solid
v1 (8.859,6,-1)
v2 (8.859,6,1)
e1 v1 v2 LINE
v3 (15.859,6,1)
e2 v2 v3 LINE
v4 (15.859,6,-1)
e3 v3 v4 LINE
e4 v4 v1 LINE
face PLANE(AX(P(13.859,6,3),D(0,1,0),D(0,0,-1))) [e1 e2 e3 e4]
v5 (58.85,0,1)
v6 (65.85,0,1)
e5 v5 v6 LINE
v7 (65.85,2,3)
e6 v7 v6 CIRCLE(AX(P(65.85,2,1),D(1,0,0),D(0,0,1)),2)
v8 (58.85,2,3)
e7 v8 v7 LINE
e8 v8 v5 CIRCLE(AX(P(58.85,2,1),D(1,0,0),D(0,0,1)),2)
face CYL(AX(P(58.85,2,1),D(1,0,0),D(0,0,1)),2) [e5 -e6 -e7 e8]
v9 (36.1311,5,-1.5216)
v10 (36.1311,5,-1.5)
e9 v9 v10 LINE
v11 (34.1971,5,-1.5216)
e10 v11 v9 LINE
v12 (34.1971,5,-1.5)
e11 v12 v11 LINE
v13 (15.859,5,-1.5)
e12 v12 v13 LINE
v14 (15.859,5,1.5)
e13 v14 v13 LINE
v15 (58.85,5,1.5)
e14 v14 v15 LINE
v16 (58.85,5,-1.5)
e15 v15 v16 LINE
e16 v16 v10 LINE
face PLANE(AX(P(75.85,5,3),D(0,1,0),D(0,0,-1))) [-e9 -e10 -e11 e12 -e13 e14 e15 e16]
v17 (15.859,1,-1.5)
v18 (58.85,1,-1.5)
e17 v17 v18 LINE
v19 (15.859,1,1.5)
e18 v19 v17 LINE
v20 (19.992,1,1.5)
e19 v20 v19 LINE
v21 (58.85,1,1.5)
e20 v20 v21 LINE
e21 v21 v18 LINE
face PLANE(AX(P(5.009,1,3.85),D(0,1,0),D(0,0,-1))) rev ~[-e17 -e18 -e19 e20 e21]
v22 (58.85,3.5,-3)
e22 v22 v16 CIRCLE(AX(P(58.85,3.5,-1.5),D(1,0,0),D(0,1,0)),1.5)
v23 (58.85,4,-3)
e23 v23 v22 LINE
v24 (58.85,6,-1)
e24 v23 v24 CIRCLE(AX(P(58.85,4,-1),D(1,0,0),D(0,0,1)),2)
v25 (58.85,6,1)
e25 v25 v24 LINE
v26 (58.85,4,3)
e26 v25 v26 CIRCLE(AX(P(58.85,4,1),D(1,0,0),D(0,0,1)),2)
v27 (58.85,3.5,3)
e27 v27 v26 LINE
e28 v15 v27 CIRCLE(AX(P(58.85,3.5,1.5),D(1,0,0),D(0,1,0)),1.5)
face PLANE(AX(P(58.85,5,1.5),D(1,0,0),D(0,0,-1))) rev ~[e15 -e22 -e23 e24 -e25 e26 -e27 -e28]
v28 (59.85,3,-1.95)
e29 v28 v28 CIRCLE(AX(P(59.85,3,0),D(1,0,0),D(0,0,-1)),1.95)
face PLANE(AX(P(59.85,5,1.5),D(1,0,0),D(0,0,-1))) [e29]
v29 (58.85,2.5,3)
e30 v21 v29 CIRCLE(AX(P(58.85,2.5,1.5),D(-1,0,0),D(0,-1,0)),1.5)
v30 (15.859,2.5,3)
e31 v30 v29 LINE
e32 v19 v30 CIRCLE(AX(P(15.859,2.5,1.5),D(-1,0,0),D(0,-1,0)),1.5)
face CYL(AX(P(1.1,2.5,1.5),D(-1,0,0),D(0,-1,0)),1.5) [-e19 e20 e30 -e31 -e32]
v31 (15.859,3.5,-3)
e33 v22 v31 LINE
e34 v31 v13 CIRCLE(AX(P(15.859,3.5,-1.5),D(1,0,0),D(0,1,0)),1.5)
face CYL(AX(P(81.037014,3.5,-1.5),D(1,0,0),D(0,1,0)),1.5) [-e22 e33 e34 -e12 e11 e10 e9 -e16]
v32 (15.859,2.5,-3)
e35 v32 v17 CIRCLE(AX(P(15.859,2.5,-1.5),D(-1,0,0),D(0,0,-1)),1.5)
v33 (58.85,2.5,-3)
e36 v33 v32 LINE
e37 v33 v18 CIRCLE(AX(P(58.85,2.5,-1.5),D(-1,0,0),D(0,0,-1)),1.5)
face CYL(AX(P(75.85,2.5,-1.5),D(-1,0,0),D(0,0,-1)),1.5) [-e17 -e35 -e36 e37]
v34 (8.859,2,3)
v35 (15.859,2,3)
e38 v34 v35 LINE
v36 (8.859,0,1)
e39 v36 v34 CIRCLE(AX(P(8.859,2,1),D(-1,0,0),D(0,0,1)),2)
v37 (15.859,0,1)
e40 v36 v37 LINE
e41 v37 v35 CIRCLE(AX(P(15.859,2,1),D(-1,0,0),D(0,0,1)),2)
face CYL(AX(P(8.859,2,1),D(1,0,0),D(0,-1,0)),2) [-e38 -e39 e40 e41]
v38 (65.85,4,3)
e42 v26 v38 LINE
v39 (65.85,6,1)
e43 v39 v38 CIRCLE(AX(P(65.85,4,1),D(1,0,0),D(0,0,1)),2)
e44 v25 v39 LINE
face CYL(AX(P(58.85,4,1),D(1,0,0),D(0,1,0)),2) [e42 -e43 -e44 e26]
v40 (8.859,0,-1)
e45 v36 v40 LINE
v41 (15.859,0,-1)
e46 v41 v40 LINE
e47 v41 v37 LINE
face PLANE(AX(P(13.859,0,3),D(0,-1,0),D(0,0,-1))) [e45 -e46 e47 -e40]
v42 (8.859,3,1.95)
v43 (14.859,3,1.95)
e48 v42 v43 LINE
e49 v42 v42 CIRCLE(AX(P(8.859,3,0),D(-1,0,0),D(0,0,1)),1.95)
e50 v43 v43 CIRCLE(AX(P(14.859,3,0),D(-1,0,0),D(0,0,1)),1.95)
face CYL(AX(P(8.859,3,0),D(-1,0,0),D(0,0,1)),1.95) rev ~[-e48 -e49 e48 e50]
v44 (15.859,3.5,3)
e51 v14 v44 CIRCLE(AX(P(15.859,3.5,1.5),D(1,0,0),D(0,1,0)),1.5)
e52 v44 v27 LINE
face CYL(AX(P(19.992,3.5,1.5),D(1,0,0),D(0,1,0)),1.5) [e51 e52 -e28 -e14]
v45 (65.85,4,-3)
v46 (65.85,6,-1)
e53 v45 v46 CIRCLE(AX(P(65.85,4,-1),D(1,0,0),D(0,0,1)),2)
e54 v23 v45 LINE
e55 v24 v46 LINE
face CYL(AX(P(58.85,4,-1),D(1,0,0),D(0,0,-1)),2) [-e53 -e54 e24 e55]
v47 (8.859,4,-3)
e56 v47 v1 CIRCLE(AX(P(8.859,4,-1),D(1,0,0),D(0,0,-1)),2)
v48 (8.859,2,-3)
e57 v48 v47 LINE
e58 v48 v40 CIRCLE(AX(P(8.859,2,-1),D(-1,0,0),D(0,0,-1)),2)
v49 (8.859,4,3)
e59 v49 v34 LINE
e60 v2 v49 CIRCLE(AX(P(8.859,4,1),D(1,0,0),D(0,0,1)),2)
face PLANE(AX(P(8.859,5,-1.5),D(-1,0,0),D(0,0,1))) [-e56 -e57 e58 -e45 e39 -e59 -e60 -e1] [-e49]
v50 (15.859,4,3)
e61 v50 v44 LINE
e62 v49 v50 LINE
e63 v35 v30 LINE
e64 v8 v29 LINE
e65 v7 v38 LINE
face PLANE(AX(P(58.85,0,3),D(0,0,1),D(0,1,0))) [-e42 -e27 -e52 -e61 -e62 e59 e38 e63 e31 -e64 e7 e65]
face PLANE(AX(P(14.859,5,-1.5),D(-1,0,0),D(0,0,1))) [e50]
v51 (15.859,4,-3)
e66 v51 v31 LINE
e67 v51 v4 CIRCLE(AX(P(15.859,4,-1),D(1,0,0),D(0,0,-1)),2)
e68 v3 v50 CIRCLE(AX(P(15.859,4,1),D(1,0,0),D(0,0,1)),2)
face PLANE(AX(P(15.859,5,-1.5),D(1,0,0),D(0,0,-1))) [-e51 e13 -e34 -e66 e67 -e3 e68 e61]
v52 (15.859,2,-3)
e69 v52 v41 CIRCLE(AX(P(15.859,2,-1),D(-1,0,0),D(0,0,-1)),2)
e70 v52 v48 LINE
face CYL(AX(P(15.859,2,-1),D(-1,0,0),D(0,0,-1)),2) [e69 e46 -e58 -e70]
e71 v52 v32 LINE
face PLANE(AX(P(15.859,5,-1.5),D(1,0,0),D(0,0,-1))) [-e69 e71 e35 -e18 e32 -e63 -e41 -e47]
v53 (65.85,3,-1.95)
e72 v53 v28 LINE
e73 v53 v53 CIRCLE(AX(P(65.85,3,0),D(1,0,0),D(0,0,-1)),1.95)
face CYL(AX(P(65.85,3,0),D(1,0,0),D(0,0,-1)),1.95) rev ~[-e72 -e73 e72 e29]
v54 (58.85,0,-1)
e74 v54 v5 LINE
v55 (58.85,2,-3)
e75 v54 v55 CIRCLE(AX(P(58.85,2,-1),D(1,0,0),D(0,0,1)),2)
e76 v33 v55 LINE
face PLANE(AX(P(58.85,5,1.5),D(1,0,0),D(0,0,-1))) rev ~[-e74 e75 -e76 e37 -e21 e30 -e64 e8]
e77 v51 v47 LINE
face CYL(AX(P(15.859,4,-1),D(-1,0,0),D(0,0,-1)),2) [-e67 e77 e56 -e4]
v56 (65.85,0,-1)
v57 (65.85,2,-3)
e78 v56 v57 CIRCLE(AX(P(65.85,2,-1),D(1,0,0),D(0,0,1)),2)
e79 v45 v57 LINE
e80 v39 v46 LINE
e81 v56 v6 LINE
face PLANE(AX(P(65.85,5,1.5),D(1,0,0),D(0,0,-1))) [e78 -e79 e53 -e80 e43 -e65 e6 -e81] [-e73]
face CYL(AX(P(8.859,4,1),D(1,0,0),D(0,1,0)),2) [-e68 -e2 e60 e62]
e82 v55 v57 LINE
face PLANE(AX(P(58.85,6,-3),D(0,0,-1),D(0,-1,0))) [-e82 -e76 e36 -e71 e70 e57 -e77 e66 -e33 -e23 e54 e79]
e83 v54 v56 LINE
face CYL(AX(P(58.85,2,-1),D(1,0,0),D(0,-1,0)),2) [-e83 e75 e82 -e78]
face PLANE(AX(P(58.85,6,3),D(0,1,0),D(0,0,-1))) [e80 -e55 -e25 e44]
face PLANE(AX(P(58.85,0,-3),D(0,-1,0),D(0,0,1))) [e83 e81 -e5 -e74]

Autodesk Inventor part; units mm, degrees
ref_plane "YZ Plane" through (0, 0, 0) normal (1, 0, 0) x (0, 1, 0)
ref_plane "XZ Plane" through (0, 0, 0) normal (0, 1, 0) x (-1, 0, 0)
ref_plane "XY Plane" through (0, 0, 0) normal (0, 0, 1) x (1, 0, 0)
sketch "Sketch1" plane through (0, 0, 0) normal (0, 1, 0) x (-1, 0, 0)
  point P0 (0, 0)
sketch "Sketch2" plane through (0, 0, 0) normal (0, 1, 0) x (-1, 0, 0)
  circle A0 centre (0, 0) radius 3.85
  dimension "d0" = 7.7
extrude "Extrusion1" add sketch "Sketch2" along normal blind 6
sketch "Sketch3" plane through (0, 6, 0) normal (0, 1, 0) x (1, 0, 0)
  circle A0 centre (0, 0) radius 1
  dimension "d3" = 2
extrude "Extrusion2" cut sketch "Sketch3" against normal through all
sketch "Sketch4" plane through (0, 0, 0) normal (0, -1, 0) x (1, 0, 0)
  circle A0 centre (0, 0) radius 3.85 projected
  line L0 (0, 3.85) -> (3.85, 3.85)
  line L1 (3.85, 3.85) -> (3.85, -3.85)
  line L2 (3.85, -3.85) -> (0, -3.85)
  line L3 (3.85, 3.85) -> (4.85, 3.85)
  line L4 (4.85, 3.85) -> (4.85, -3.85)
  line L5 (4.85, -3.85) -> (3.85, -3.85)
  line L6 (3.85, -3.85) -> (3.85, 3.85)
  line L7 (4.85, 3.85) -> (4.85, 3)
  line L8 (4.85, -3.85) -> (4.85, -3)
  line L9 (4.85, 3) -> (3.85, 3)
  line L10 (3.85, 3) -> (3.85, -3)
  line L11 (3.85, -3) -> (4.85, -3)
  line L12 (4.85, -3) -> (4.85, 3)
  point P0 (3.85, -3)
  dimension "d6" = 1
  dimension "d7" = 0.85
  dimension "d8" = 0.85
extrude "Extrusion3" add sketch "Sketch4" against normal blind 6 contours L1 L9 L4 L11
sketch "Sketch5" plane through (4.85, 0, 3) normal (1, 0, 0) x (0, 0, -1)
  line L0 (6.85, 0) -> (-0.85, 0) projected
  line L1 (6, 0) -> (6, 6) projected
  line L2 (0.0003, 0) -> (6, 0)
  line L3 (6, 0) -> (6, 1)
  line L4 (6, 1) -> (0.0003, 1)
  line L5 (0.0003, 1) -> (0.0003, 0)
  line L6 (6.85, 6) -> (-0.85, 6) projected
  line L7 (0.0003, 6) -> (6, 6)
  line L8 (6, 6) -> (6, 5)
  line L9 (6, 5) -> (0.0003, 5)
  line L10 (0.0003, 5) -> (0.0003, 6)
  point P0 (3, 0)
  point P1 (3, 6)
  dimension "d11" = 1
  dimension "d12" = 1
extrude "Extrusion4" cut sketch "Sketch5" against normal blind 1 contours L9 L10 L6 L1
extrude "Extrusion5" cut sketch "Sketch5" against normal blind 1 contours L0 L5 L4 L1
sketch "Sketch6" plane through (4.85, 5, 2.9997) normal (0, 0, -1) x (-1, 0, 0)
  line L0 (0, 0) -> (1, 0) projected
  line L1 (0, -5) -> (0, 1) projected
  line L2 (1, 0) -> (0, 0)
  line L3 (0, 0) -> (0, 1)
  line L4 (0, 1) -> (1, 1)
  line L5 (1, 1) -> (1, 0)
  line L6 (1, -5) -> (0, -5)
  line L7 (0, -5) -> (0, -3.9916)
  line L8 (0, -3.9916) -> (1, -3.9916)
  line L9 (1, -3.9916) -> (1, -5)
  point P0 (4.85, -5)
extrude "Extrusion6" cut sketch "Sketch6" against normal through all contours L1 L4 L5 L0
extrude "Extrusion7" cut sketch "Sketch6" against normal through all contours L1 L8 L9 L6
sketch "Sketch7" plane through (4.85, 5, 3) normal (1, 0, 0) x (0, 0, -1)
  line L0 (0, 0) -> (3, 0) projected
  line L1 (6, -4) -> (6, 0) projected
  line L2 (0, 0) -> (6, 0)
  line L3 (6, 0) -> (6, -4)
  line L4 (6, -4) -> (0, -4)
  line L5 (0, -4) -> (0, 0)
  point P0 (3, -5)
extrude "Extrusion8" add sketch "Sketch7" along normal blind 71
sketch "Sketch8" plane through (3.85, 1, -3) normal (0, 0, -1) x (-1, 0, 0)
  point P0 (3.85, -1)
sketch "Sketch9" plane through (3.85, 5, 0) normal (0, 1, 0) x (1, 0, 0)
  line L0 (72, 3) -> (72, -3) projected
  line L1 (72, 0) -> (75.85, 0)
  circle A0 centre (75.85, 0) radius 3.85
  point P0 (-3.85, 0)
  dimension "d23" = 3.85
extrude "Extrusion9" add sketch "Sketch9" along normal blind 1
extrude "Extrusion10" add sketch "Sketch9" against normal blind 5
sketch "Sketch10" plane through (79.7, 6, 0) normal (0, 1, 0) x (1, 0, 0)
  circle A0 centre (0, 0) radius 1.85
  point P0 (-79.7, 0)
  dimension "d28" = 3.7
extrude "Extrusion11" cut sketch "Sketch10" against normal through all
sketch "Sketch11" plane through (3.85, 5, 0) normal (-1, 0, 0) x (0, 0, 1)
  point P0 (0, -5)
sketch "Sketch12" plane through (3.85, 5, -3) normal (-1, 0, 0) x (0, 0, 1)
  line L0 (0, 0) -> (3, 0) projected
  line L1 (6, 0) -> (6, -4) projected
  line L2 (0, 0) -> (6, 0)
  line L3 (6, 0) -> (6, -4)
  line L4 (6, -4) -> (0, -4)
  line L5 (0, -4) -> (0, 0)
  point P0 (3, -5)
extrude "Extrusion12" add sketch "Sketch12" along normal blind 2
sketch "Sketch13" plane through (75.85, 5, 3) normal (1, 0, 0) x (0, 0, -1)
  line L0 (3, 0) -> (0, 0) projected
  line L1 (3, -4) -> (6, -4) projected
  line L2 (0, 0) -> (6, 0)
  line L3 (6, 0) -> (6, -4)
  line L4 (6, -4) -> (0, -4)
  line L5 (0, -4) -> (0, 0)
  point P0 (3, -5)
extrude "Extrusion13" add sketch "Sketch13" along normal blind 1.6
fillet "Fillet1" radius 1.5 2 edges at (76.5685, 5, 3) (39.1315, 5, 3)
fillet "Fillet2" radius 1.5 1 edges at (39.85, 5, -3)
fillet "Fillet3" radius 1.5 1 edges at (39.85, 1, -3)
fillet "Fillet4" radius 1.5 3 edges at (4.35, 1, 2.9997) (40.35, 1, 3) (4.85, 1, 2.9998)
sketch "Sketch14" plane through (3.5458, 5, 1.5) normal (0, 1, 0) x (1, 0, 0)
  point P0 (-3.5458, 1.5)
sketch "Sketch15" plane through (3.5458, 5, 1.5) normal (0, 1, 0) x (1, 0, 0)
  line L0 (0.4177, 2.9988) -> (2.9717, 2.9988) construction
  line L1 (2.9717, 2.9988) -> (2.9717, -0.0492) construction
  line L2 (2.9717, -0.0492) -> (0.4177, -0.0492) construction
  line L3 (0.4177, -0.0492) -> (0.4177, 2.9988) construction
  line L4 (0.398, -0.0492) -> (1.4255, 2.9988)
  line L5 (1.4255, 2.9988) -> (1.9244, 2.9988)
  line L6 (1.9244, 2.9988) -> (2.952, -0.0492)
  line L7 (2.952, -0.0492) -> (2.5247, -0.0492)
  line L8 (2.5247, -0.0492) -> (2.248, 0.803)
  line L9 (2.248, 0.803) -> (1.0846, 0.803)
  line L10 (1.0846, 0.803) -> (0.808, -0.0492)
  line L11 (0.808, -0.0492) -> (0.398, -0.0492)
  line L12 (2.1369, 1.1488) -> (1.6651, 2.5839)
  line L13 (1.6651, 2.5839) -> (1.1958, 1.1488)
  line L14 (1.1958, 1.1488) -> (2.1369, 1.1488)
  point P0 (-3.5458, 1.5)
extrude "Extrusion14" add sketch "Sketch15" along normal blind 0.2
sketch "Sketch16" plane through (3.5458, 5, -1.5) normal (0, 1, 0) x (1, 0, 0)
  line L0 (69.8363, -0.0038) -> (72.3064, -0.0038) construction
  line L1 (72.3064, -0.0038) -> (72.3064, -3.0518) construction
  line L2 (72.3064, -3.0518) -> (69.8363, -3.0518) construction
  line L3 (69.8363, -3.0518) -> (69.8363, -0.0038) construction
  spline S0 degree 2 poles (72.2125, -2.1157) (72.2125, -2.3429) (72.0396, -2.6912) (71.8963, -2.8048) knots 0 0 0 1 2 2 2
  spline S1 degree 2 poles (71.8963, -2.8048) (71.7234, -2.9382) (71.3307, -3.0518) (71.0195, -3.0518) knots 0 0 0 1 2 2 2
  line L4 (71.0195, -3.0518) -> (70.1451, -3.0518)
  line L5 (70.1451, -3.0518) -> (70.1451, -0.0038)
  line L6 (70.1451, -0.0038) -> (70.9528, -0.0038)
  spline S2 degree 2 poles (70.9528, -0.0038) (71.2788, -0.0038) (71.6049, -0.0458) (71.7531, -0.1273) knots 0 0 0 1 2 2 2
  spline S3 degree 2 poles (71.7531, -0.1273) (71.9186, -0.2138) (72.0692, -0.4978) (72.0692, -0.6905) knots 0 0 0 1 2 2 2
  spline S4 degree 2 poles (72.0692, -0.6905) (72.0692, -0.9054) (71.842, -1.2462) (71.6419, -1.3426) knots 0 0 0 1 2 2 2
  line L7 (71.6419, -1.3426) -> (71.6419, -1.3574)
  spline S5 degree 2 poles (71.6419, -1.3574) (71.9136, -1.4315) (72.2125, -1.8242) (72.2125, -2.1157) knots 0 0 0 1 2 2 2
  spline S6 degree 2 poles (71.7901, -2.133) (71.7901, -1.9601) (71.6913, -1.7378) (71.5431, -1.6587) knots 0 0 0 1 2 2 2
  spline S7 degree 2 poles (71.5431, -1.6587) (71.4468, -1.6093) (71.2195, -1.5797) (71.0096, -1.5797) knots 0 0 0 1 2 2 2
  line L8 (71.0096, -1.5797) -> (70.5502, -1.5797)
  line L9 (70.5502, -1.5797) -> (70.5502, -2.706)
  line L10 (70.5502, -2.706) -> (70.8787, -2.706)
  spline S8 degree 2 poles (70.8787, -2.706) (71.1454, -2.706) (71.4517, -2.6566) (71.5703, -2.5776) knots 0 0 0 1 2 2 2
  spline S9 degree 2 poles (71.5703, -2.5776) (71.6839, -2.4961) (71.7901, -2.2935) (71.7901, -2.133) knots 0 0 0 1 2 2 2
  spline S10 degree 2 poles (71.6469, -0.7473) (71.6469, -0.6386) (71.5728, -0.4756) (71.4912, -0.4287) knots 0 0 0 1 2 2 2
  spline S11 degree 2 poles (71.4912, -0.4287) (71.3924, -0.3743) (71.1529, -0.3496) (70.938, -0.3496) knots 0 0 0 1 2 2 2
  line L11 (70.938, -0.3496) -> (70.5502, -0.3496)
  line L12 (70.5502, -0.3496) -> (70.5502, -1.2413)
  line L13 (70.5502, -1.2413) -> (71.0096, -1.2413)
  spline S12 degree 2 poles (71.0096, -1.2413) (71.1998, -1.2413) (71.3801, -1.2018) (71.4764, -1.14) knots 0 0 0 1 2 2 2
  spline S13 degree 2 poles (71.4764, -1.14) (71.5703, -1.0807) (71.6469, -0.8905) (71.6469, -0.7473) knots 0 0 0 1 2 2 2
  point P0 (-3.5458, -1.5)
extrude "Extrusion15" add sketch "Sketch16" along normal blind 0.2
sketch "Sketch17" plane through (3.5458, 5, -1.5) normal (0, 1, 0) x (1, 0, 0)
  line L0 (0.4145, -1.5) -> (36.4145, -1.5)
  line L1 (30.4487, 0.0859) -> (55.6072, 0.0859) construction
  line L2 (55.6072, 0.0859) -> (55.6072, -2.5363) construction
  line L3 (55.6072, -2.5363) -> (30.4487, -2.5363) construction
  line L4 (30.4487, -2.5363) -> (30.4487, 0.0859) construction
  line L5 (32.5853, -0.4353) -> (31.2663, -3.0264)
  line L6 (31.2663, -3.0264) -> (30.8316, -3.0264)
  line L7 (30.8316, -3.0264) -> (32.2247, -0.3365)
  line L8 (32.2247, -0.3365) -> (30.6513, -0.3365)
  line L9 (30.6513, -0.3365) -> (30.6513, 0.0216)
  line L10 (30.6513, 0.0216) -> (32.5853, 0.0216)
  line L11 (32.5853, 0.0216) -> (32.5853, -0.4353)
  line L12 (34.838, -3.0264) -> (32.9583, -3.0264)
  line L13 (32.9583, -3.0264) -> (32.9583, -2.5941)
  spline S0 degree 2 poles (32.9583, -2.5941) (33.1608, -2.4039) (33.5214, -2.0507) (33.6943, -1.8605) knots 0 0 0 1 2 2 2
  spline S1 degree 2 poles (33.6943, -1.8605) (34.0426, -1.4777) (34.297, -1.0182) (34.297, -0.7737) knots 0 0 0 1 2 2 2
  spline S2 degree 2 poles (34.297, -0.7737) (34.297, -0.6453) (34.218, -0.4526) (34.1464, -0.3909) knots 0 0 0 1 2 2 2
  spline S3 degree 2 poles (34.1464, -0.3909) (34.0747, -0.3291) (33.887, -0.2674) (33.7734, -0.2674) knots 0 0 0 1 2 2 2
  spline S4 degree 2 poles (33.7734, -0.2674) (33.6647, -0.2674) (33.4424, -0.3217) (33.3411, -0.3637) knots 0 0 0 1 2 2 2
  spline S5 degree 2 poles (33.3411, -0.3637) (33.2547, -0.3983) (33.0941, -0.4971) (33.0447, -0.5317) knots 0 0 0 1 2 2 2
  line L14 (33.0447, -0.5317) -> (33.0225, -0.5317)
  line L15 (33.0225, -0.5317) -> (33.0225, -0.0969)
  spline S6 degree 2 poles (33.0225, -0.0969) (33.1485, -0.0352) (33.6005, 0.0859) (33.803, 0.0859) knots 0 0 0 1 2 2 2
  spline S7 degree 2 poles (33.803, 0.0859) (34.2303, 0.0859) (34.712, -0.3662) (34.712, -0.7515) knots 0 0 0 1 2 2 2
  spline S8 degree 2 poles (34.712, -0.7515) (34.712, -0.9318) (34.628, -1.2331) (34.5539, -1.3616) knots 0 0 0 1 2 2 2
  spline S9 degree 2 poles (34.5539, -1.3616) (34.4798, -1.495) (34.2649, -1.7568) (34.1464, -1.8828) knots 0 0 0 1 2 2 2
  spline S10 degree 2 poles (34.1464, -1.8828) (33.9537, -2.0927) (33.4819, -2.5422) (33.3411, -2.6732) knots 0 0 0 1 2 2 2
  line L16 (33.3411, -2.6732) -> (34.838, -2.6732)
  line L17 (34.838, -2.6732) -> (34.838, -3.0264)
  line L18 (37.8958, -3.0264) -> (37.8958, -1.7024)
  spline S11 degree 2 poles (37.8958, -1.7024) (37.8958, -1.5444) (37.8711, -1.2751) (37.8316, -1.201) knots 0 0 0 1 2 2 2
  spline S12 degree 2 poles (37.8316, -1.201) (37.7921, -1.1195) (37.6414, -1.0405) (37.5105, -1.0405) knots 0 0 0 1 2 2 2
  spline S13 degree 2 poles (37.5105, -1.0405) (37.392, -1.0405) (37.1203, -1.1862) (36.977, -1.3245) knots 0 0 0 1 2 2 2
  spline S14 degree 2 poles (36.977, -1.3245) (36.9795, -1.3591) (36.9844, -1.4554) (36.9844, -1.5197) knots 0 0 0 1 2 2 2
  line L19 (36.9844, -1.5197) -> (36.9844, -3.0264)
  line L20 (36.9844, -3.0264) -> (36.5991, -3.0264)
  line L21 (36.5991, -3.0264) -> (36.5991, -1.7024)
  spline S15 degree 2 poles (36.5991, -1.7024) (36.5991, -1.5444) (36.5744, -1.2751) (36.5349, -1.201) knots 0 0 0 1 2 2 2
  spline S16 degree 2 poles (36.5349, -1.201) (36.4953, -1.1195) (36.3447, -1.0405) (36.2138, -1.0405) knots 0 0 0 1 2 2 2
  spline S17 degree 2 poles (36.2138, -1.0405) (36.0903, -1.0405) (35.8161, -1.1961) (35.6876, -1.3171) knots 0 0 0 1 2 2 2
  line L22 (35.6876, -1.3171) -> (35.6876, -3.0264)
  line L23 (35.6876, -3.0264) -> (35.3023, -3.0264)
  line L24 (35.3023, -3.0264) -> (35.3023, -0.7391)
  line L25 (35.3023, -0.7391) -> (35.6876, -0.7391)
  line L26 (35.6876, -0.7391) -> (35.6876, -0.9911)
  spline S18 degree 2 poles (35.6876, -0.9911) (35.8383, -0.8404) (36.1347, -0.6749) (36.3126, -0.6749) knots 0 0 0 1 2 2 2
  spline S19 degree 2 poles (36.3126, -0.6749) (36.5151, -0.6749) (36.8288, -0.8602) (36.9103, -1.0701) knots 0 0 0 1 2 2 2
  spline S20 degree 2 poles (36.9103, -1.0701) (37.0857, -0.875) (37.4167, -0.6749) (37.6093, -0.6749) knots 0 0 0 1 2 2 2
  spline S21 degree 2 poles (37.6093, -0.6749) (37.7575, -0.6749) (37.9996, -0.7663) (38.0885, -0.87) knots 0 0 0 1 2 2 2
  spline S22 degree 2 poles (38.0885, -0.87) (38.1799, -0.9738) (38.2812, -1.285) (38.2812, -1.5197) knots 0 0 0 1 2 2 2
  line L27 (38.2812, -1.5197) -> (38.2812, -3.0264)
  line L28 (38.2812, -3.0264) -> (37.8958, -3.0264)
  line L29 (41.4156, -3.0264) -> (41.4156, -1.7024)
  spline S23 degree 2 poles (41.4156, -1.7024) (41.4156, -1.5444) (41.3909, -1.2751) (41.3514, -1.201) knots 0 0 0 1 2 2 2
  spline S24 degree 2 poles (41.3514, -1.201) (41.3119, -1.1195) (41.1612, -1.0405) (41.0303, -1.0405) knots 0 0 0 1 2 2 2
  spline S25 degree 2 poles (41.0303, -1.0405) (40.9117, -1.0405) (40.64, -1.1862) (40.4968, -1.3245) knots 0 0 0 1 2 2 2
  spline S26 degree 2 poles (40.4968, -1.3245) (40.4992, -1.3591) (40.5042, -1.4554) (40.5042, -1.5197) knots 0 0 0 1 2 2 2
  line L30 (40.5042, -1.5197) -> (40.5042, -3.0264)
  line L31 (40.5042, -3.0264) -> (40.1189, -3.0264)
  line L32 (40.1189, -3.0264) -> (40.1189, -1.7024)
  spline S27 degree 2 poles (40.1189, -1.7024) (40.1189, -1.5444) (40.0942, -1.2751) (40.0546, -1.201) knots 0 0 0 1 2 2 2
  spline S28 degree 2 poles (40.0546, -1.201) (40.0151, -1.1195) (39.8644, -1.0405) (39.7335, -1.0405) knots 0 0 0 1 2 2 2
  spline S29 degree 2 poles (39.7335, -1.0405) (39.61, -1.0405) (39.3359, -1.1961) (39.2074, -1.3171) knots 0 0 0 1 2 2 2
  line L33 (39.2074, -1.3171) -> (39.2074, -3.0264)
  line L34 (39.2074, -3.0264) -> (38.8221, -3.0264)
  line L35 (38.8221, -3.0264) -> (38.8221, -0.7391)
  line L36 (38.8221, -0.7391) -> (39.2074, -0.7391)
  line L37 (39.2074, -0.7391) -> (39.2074, -0.9911)
  spline S30 degree 2 poles (39.2074, -0.9911) (39.3581, -0.8404) (39.6545, -0.6749) (39.8323, -0.6749) knots 0 0 0 1 2 2 2
  spline S31 degree 2 poles (39.8323, -0.6749) (40.0349, -0.6749) (40.3486, -0.8602) (40.4301, -1.0701) knots 0 0 0 1 2 2 2
  spline S32 degree 2 poles (40.4301, -1.0701) (40.6054, -0.875) (40.9364, -0.6749) (41.1291, -0.6749) knots 0 0 0 1 2 2 2
  spline S33 degree 2 poles (41.1291, -0.6749) (41.2773, -0.6749) (41.5194, -0.7663) (41.6083, -0.87) knots 0 0 0 1 2 2 2
  spline S34 degree 2 poles (41.6083, -0.87) (41.6997, -0.9738) (41.8009, -1.285) (41.8009, -1.5197) knots 0 0 0 1 2 2 2
  line L38 (41.8009, -1.5197) -> (41.8009, -3.0264)
  line L39 (41.8009, -3.0264) -> (41.4156, -3.0264)
  point P0 (-3.5458, -1.5)
  dimension "d43" = 36
extrude "Extrusion16" add sketch "Sketch17" along normal blind 0.2
sketch "Sketch18" plane through (3.5458, 5.2, -1.5) normal (0, 1, 0) x (1, 0, 0)
  line L0 (29.8828, 2.0952) -> (43.3392, 2.0952)
  line L1 (43.3392, 2.0952) -> (43.3392, -5.5663)
  line L2 (43.3392, -5.5663) -> (29.8828, -5.5663)
  line L3 (29.8828, -5.5663) -> (29.8828, 2.0952)
  point P0 (-3.5458, -1.5)
extrude "Extrusion17" cut sketch "Sketch18" against normal blind 0.2
sketch "Sketch19" plane through (3.5458, 5.2, 1.5) normal (0, 1, 0) x (1, 0, 0)
  line L0 (0.3624, -0.1736) -> (3.3783, -0.1736)
  line L1 (3.3783, -0.1736) -> (3.3783, 3.2897)
  line L2 (3.3783, 3.2897) -> (0.3624, 3.2897)
  line L3 (0.3624, 3.2897) -> (0.3624, -0.1736)
  line L4 (72.2697, -0.5369) -> (69.8008, -0.5369)
  line L5 (69.8008, -0.5369) -> (69.8008, 3.7021)
  line L6 (69.8008, 3.7021) -> (72.2697, 3.7021)
  line L7 (72.2697, 3.7021) -> (72.2697, -0.5369)
  point P0 (-3.5458, 1.5)
extrude "Extrusion18" cut sketch "Sketch19" against normal blind 0.2 contours L3 L2 L1 L0
extrude "Extrusion19" cut sketch "Sketch19" against normal blind 0.2 contours L4 L5 L6 L7
sketch "Sketch20" plane through (79.7, 0, 0) normal (0, -1, 0) x (1, 0, 0)
  point P0 (-79.7, 0)
sketch "Sketch21" plane through (79.7, 6, 0) normal (0, 1, 0) x (1, 0, 0)
  circle A0 centre (0, 0) radius 1.95
  point P0 (-79.7, 0)
  dimension "d52" = 3.9
extrude "Extrusion20" cut sketch "Sketch21" against normal through all
sketch "Sketch22" plane through (0, 6, 0) normal (0, 1, 0) x (1, 0, 0)
  line L0 (0, 0) -> (0, -3.85)
  circle A0 centre (0, 0) radius 3.85 projected
  line L1 (0, -3.85) -> (3.85, -3.85)
  line L2 (3.85, -3.85) -> (-3.85, -3.85)
  line L3 (-3.85, -3.85) -> (-3.85, 3.85)
  line L4 (-3.85, 3.85) -> (3.85, 3.85)
  line L5 (3.85, 3.85) -> (3.85, -3.85)
extrude "Extrusion21" cut sketch "Sketch22" against normal through all contours A0
sketch "Sketch23" plane through (79.7, 5, 0) normal (0, 1, 0) x (1, 0, 0)
  arc A0 (-76.1542, -1.5) -> (-76.1542, 1.5) centre (-79.7, 0) ccw projected
  line L0 (-75.85, 0) -> (-77.9753, 0)
  line L1 (-77.9753, 0) -> (-77.9753, 3.5992)
  line L2 (-77.9753, 3.5992) -> (-75.85, 3.5992)
  line L3 (-75.85, 3.5992) -> (-75.85, 0)
  line L4 (-75.85, 0) -> (-77.9753, 0)
  line L5 (-77.9753, 0) -> (-77.9753, -3.4561)
  line L6 (-77.9753, -3.4561) -> (-75.85, -3.4561)
  line L7 (-75.85, -3.4561) -> (-75.85, 0)
  line L8 (-75.85, -3.4561) -> (-65.85, -3.4561)
  line L9 (-65.85, -3.4561) -> (-65.85, 3.5992)
  line L10 (-65.85, 3.5992) -> (-75.85, 3.5992)
  line L11 (-75.85, 3.5992) -> (-75.85, -3.4561)
  dimension "d57" = 10
extrude "Extrusion22" cut sketch "Sketch23" against normal through all contours L3 L10 L9 L8 L7
extrude "Extrusion23" cut sketch "Sketch23" against normal through all contours L7 L6 L5 L0
extrude "Extrusion24" cut sketch "Sketch23" against normal through all contours L0 L1 L2 L3
sketch "Sketch24" plane through (13.85, 5, -1.5) normal (-1, 0, 0) x (0, 0, 1)
  line L0 (-2.9013, -5) -> (5.7799, -5)
  line L1 (5.7799, -5) -> (5.7799, 1.344)
  line L2 (5.7799, 1.344) -> (-2.9013, 1.344)
  line L3 (-2.9013, 1.344) -> (-2.9013, -5)
  point P0 (1.5, -5)
extrude "Extrusion25" cut sketch "Sketch24" against normal blind 6.142
sketch "Sketch25" plane through (19.992, 5, -1.5) normal (-1, 0, 0) x (0, 0, 1)
  line L0 (-1.5, 0) -> (4.5, 0)
  line L1 (4.5, 0) -> (4.5, -4)
  line L2 (4.5, -4) -> (-1.5, -4)
  line L3 (-1.5, -4) -> (-1.5, 0)
  point P0 (1.5, -5)
  dimension "d66" = 6
  dimension "d67" = 4
extrude "Extrusion26" add sketch "Sketch25" along normal blind 6.133
sketch "Sketch26" plane through (79.7, 6, 0) normal (0, 1, 0) x (1, 0, 0)
  line L0 (-65.841, -3) -> (-65.841, 3) projected
  line L1 (-65.841, 0) -> (-69.691, 0)
  circle A0 centre (-69.691, 0) radius 3.85
  point P0 (-79.7, 0)
  dimension "d70" = 3.85
extrude "Extrusion27" add sketch "Sketch26" against normal blind 6
sketch "Sketch27" plane through (13.859, 5, -1.5) normal (-1, 0, 0) x (0, 0, 1)
  point P0 (1.5, -5)
sketch "Sketch28" plane through (13.859, 5, -1.5) normal (-1, 0, 0) x (0, 0, 1)
  line L0 (-1.5, 0) -> (-1.5, -4) projected
  line L1 (4.5, 0) -> (3, 0) projected
  line L2 (-1.5, -4) -> (4.5, -4)
  line L3 (4.5, -4) -> (4.5, 0)
  line L4 (4.5, 0) -> (-1.5, 0)
  line L5 (-1.5, 0) -> (-1.5, -4)
  point P0 (1.5, -5)
extrude "Extrusion28" add sketch "Sketch28" along normal blind 5
sketch "Sketch29" plane through (19.992, 3.5, 3) normal (0, 0, 1) x (1, 0, 0)
  point P0 (-19.992, -3.5)
sketch "Sketch30" plane through (79.7, 5, 0) normal (0, 1, 0) x (1, 0, 0)
  point P0 (-79.7, 0)
sketch "Sketch31" plane through (19.992, 5, -1.5) normal (1, 0, 0) x (0, 0, -1)
  arc A0 (-3, 0) -> (-4.5, -1.5) centre (-3, -1.5) ccw projected
  circle A1 centre (-3, -1.5) radius 1.5
  circle A2 centre (-3, -1.5) radius 1.5
  arc A3 (-4.5, -2.5) -> (-3, -4) centre (-3, -2.5) ccw projected
  circle A4 centre (-3, -2.5) radius 1.5
  arc A5 (0, -4) -> (1.5, -2.5) centre (0, -2.5) ccw projected
  circle A6 centre (0, -2.5) radius 1.5
  arc A7 (1.5, -1.5) -> (0, 0) centre (0, -1.5) ccw projected
  circle A8 centre (0, -1.5) radius 1.5
  line L0 (-4.5, -1.5) -> (-4.5, 0) projected
  line L1 (-4.5, 0) -> (-3, 0)
  line L2 (-3, 0) -> (-3, -1.5)
  line L3 (-3, -1.5) -> (-4.5, -1.5)
  line L4 (-4.5, -1.5) -> (-4.5, 0)
  line L5 (0, 0) -> (1.5, 0)
  line L6 (1.5, 0) -> (1.5, -1.5)
  line L7 (1.5, -1.5) -> (0, -1.5)
  line L8 (0, -1.5) -> (0, 0)
  line L9 (-3, -4) -> (-4.5, -4)
  line L10 (-4.5, -4) -> (-4.5, -2.5)
  line L11 (-4.5, -2.5) -> (-3, -2.5)
  line L12 (-3, -2.5) -> (-3, -4)
  line L13 (0, -4) -> (1.5, -4)
  line L14 (1.5, -4) -> (1.5, -2.5)
  line L15 (1.5, -2.5) -> (0, -2.5)
  line L16 (0, -2.5) -> (0, -4)
  point P0 (-1.5, -5)
extrude "Extrusion29" cut sketch "Sketch31" against normal blind 10 contours A0 L0 L1
extrude "Extrusion30" cut sketch "Sketch31" against normal blind 10 contours A3 L9 L10
extrude "Extrusion31" cut sketch "Sketch31" against normal blind 10 contours A5 L14 L13
extrude "Extrusion32" cut sketch "Sketch31" against normal blind 10 contours L5 L6 A7
sketch "Sketch32" plane through (79.7, 6, 0) normal (0, 1, 0) x (1, 0, 0)
  point P0 (-79.7, 0)
sketch "Sketch33" plane through (10.009, 6, 0) normal (0, 1, 0) x (1, 0, 0)
  circle A0 centre (0, 0) radius 3.85
  point P0 (-10.009, 0)
extrude "Extrusion33" add sketch "Sketch33" against normal blind 6
sketch "Sketch34" plane through (10.009, 6, 0) normal (0, 1, 0) x (1, 0, 0)
  circle A0 centre (0, 0) radius 1.925
  point P0 (-10.009, 0)
  dimension "d85" = 3.85
extrude "Extrusion34" cut sketch "Sketch34" against normal blind 6
sketch "Sketch35" plane through (10.009, 6, 0) normal (0, 1, 0) x (1, 0, 0)
  point P0 (-10.009, 0)
sketch "Sketch36" plane through (79.7, 6, 0) normal (0, 1, 0) x (1, 0, 0)
  point P0 (-79.7, 0)
sketch "Sketch37" plane through (79.7, 6, 0) normal (0, 1, 0) x (1, 0, 0)
  point P0 (-79.7, 0)
sketch "Sketch38" plane through (10.009, 6, 0) normal (0, 1, 0) x (1, 0, 0)
  circle A0 centre (0, 0) radius 1.95
  point P0 (-10.009, 0)
  dimension "d89" = 3.9
extrude "Extrusion35" cut sketch "Sketch38" against normal blind 6
sketch "Sketch39" plane through (79.7, 6, 0) normal (0, 1, 0) x (1, 0, 0)
  point P0 (-79.7, 0)
sketch "Sketch40" plane through (79.7, 6, 0) normal (0, 1, 0) x (1, 0, 0)
  point P0 (-79.7, 0)
sketch "Sketch41" plane through (79.7, 6, 0) normal (0, 1, 0) x (1, 0, 0)
  point P0 (-79.7, 0)
sketch "Sketch42" plane through (79.7, 6, 0) normal (0, 1, 0) x (1, 0, 0)
  circle A0 centre (0, 0) radius 3
  arc A1 (-66.1452, -1.5) -> (-66.1452, 1.5) centre (-69.691, 0) ccw projected
  circle A2 centre (-69.691, 0) radius 3
  point P0 (-79.7, 0)
  dimension "d92" = 6
  dimension "d93" = 6
extrude "Extrusion36" cut sketch "Sketch42" against normal through all contours A0
extrude "Extrusion37" cut sketch "Sketch42" against normal through all contours A2
sketch "Sketch43" plane through (10.009, 0, 0) normal (0, -1, 0) x (1, 0, 0)
  circle A0 centre (0, 0) radius 3.85 projected
  line L0 (0, 3.85) -> (-5, 3.85)
  line L1 (-5, 3.85) -> (-5, -3.85)
  line L2 (-5, -3.85) -> (0, -3.85)
  line L3 (0, -3.85) -> (0, 3.85)
  line L4 (-5, 3.85) -> (-4.5, 3.85)
  line L5 (-4.5, 3.85) -> (-4.5, -3.85)
  line L6 (-4.5, -3.85) -> (-5, -3.85)
  line L7 (-5, -3.85) -> (-5, 3.85)
  point P0 (-10.009, 0)
  dimension "d98" = 5
  dimension "d99" = 0.5
extrude "Extrusion38" add sketch "Sketch43" against normal blind 1 contours L5 L2 L1 L0
sketch "Sketch44" plane through (5.009, 0, -3.85) normal (-1, 0, 0) x (0, 0, 1)
  point P0 (3.85, 0)
sketch "Sketch45" plane through (5.009, 0, -3.85) normal (-1, 0, 0) x (0, 0, 1)
  line L0 (7.7, 1) -> (0, 1) projected
  line L1 (0, 0) -> (7.7, 0) projected
  line L2 (0, 1) -> (7.7, 1)
  line L3 (7.7, 1) -> (7.7, 0)
  line L4 (7.7, 0) -> (0, 0)
  line L5 (0, 0) -> (0, 1)
  point P0 (3.85, 0)
extrude "Extrusion39" cut sketch "Sketch45" against normal through all
sketch "Sketch46" plane through (10.009, 6, 0) normal (0, 1, 0) x (1, 0, 0)
  circle A0 centre (0, 0) radius 3.85 projected
  line L0 (0, 3.85) -> (-5, 3.85)
  line L1 (-5, 3.85) -> (-5, -3.85)
  line L2 (-5, -3.85) -> (0, -3.85)
  line L3 (0, -3.85) -> (0, 3.85)
  line L4 (-5, 3.85) -> (-4.5, 3.85)
  line L5 (-4.5, 3.85) -> (-4.5, -3.85)
  line L6 (-4.5, -3.85) -> (-5, -3.85)
  line L7 (-5, -3.85) -> (-5, 3.85)
  point P0 (-10.009, 0)
  dimension "d104" = 5
  dimension "d105" = 0.5
extrude "Extrusion40" add sketch "Sketch46" against normal blind 1 contours L5 L2 L1 L0
sketch "Sketch47" plane through (5.009, 6, -3.85) normal (-1, 0, 0) x (0, 0, 1)
  line L0 (0, 0) -> (0, -1) projected
  line L1 (0, -1) -> (7.7, -1) projected
  line L2 (0, 0) -> (7.7, 0)
  line L3 (7.7, 0) -> (7.7, -1)
  line L4 (7.7, -1) -> (0, -1)
  line L5 (0, -1) -> (0, 0)
  point P0 (3.85, -6)
extrude "Extrusion41" cut sketch "Sketch47" against normal through all
sketch "Sketch48" plane through (12.422, 2.5, 3) normal (0, 0, 1) x (1, 0, 0)
  line L0 (1.1328, 2.5) -> (63.7322, 2.5) projected
  line L1 (1.1328, -1.5) -> (63.7322, -1.5) projected
  line L2 (63.7322, 2.5) -> (63.7322, -1.5)
  line L3 (63.7322, 2.5) -> (71.128, 2.5) projected
  line L4 (71.128, 2.5) -> (63.7322, -1.5)
  line L5 (63.7322, 2.5) -> (71.128, -1.5)
  line L6 (71.128, -1.5) -> (71.128, 2.5) projected
  circle A0 centre (67.4301, 0.5) radius 4.2041
  line L7 (67.4301, 0.5) -> (67.4301, -1.5)
  line L8 (64.278, -1.5) -> (70.278, -1.5) projected
  line L9 (70.278, 2.5) -> (70.278, -1.5) projected
  line L10 (71.128, 0.6263) -> (70.278, 0.6263)
  line L11 (63.7322, 0.5) -> (64.5822, 0.5)
  line L12 (64.5822, 2.5) -> (64.5822, -1.5)
  line L13 (70.278, 2.5) -> (70.278, -1.5)
  line L14 (64.5822, 2.5) -> (70.278, -1.5)
  line L15 (70.278, 2.5) -> (64.5822, -1.5)
  circle A1 centre (67.4301, 0.5) radius 3.48
  line L16 (63.7322, 2.5) -> (71.128, 2.5)
  point P0 (-12.422, -2.5)
  dimension "d110" = 4
  dimension "d111" = 0.85
extrude "Extrusion42" add sketch "Sketch48" against normal blind 6 contours A0 L3 A1
sketch "Sketch49" plane through (12.422, 2.5, 3) normal (0, 0, 1) x (1, 0, 0)
  line L0 (71.128, 2.5) -> (61.853, 2.5)
  line L1 (61.853, 2.5) -> (61.853, 6.3445)
  line L2 (61.853, 6.3445) -> (71.128, 6.3445)
  line L3 (71.128, 6.3445) -> (71.128, 2.5)
  point P0 (-12.422, -2.5)
extrude "Extrusion43" cut sketch "Sketch49" against normal through all
sketch "Sketch50" plane through (79.7, 5, 0) normal (0, 1, 0) x (1, 0, 0)
  arc A0 (-3.5458, -1.5) -> (-3.5458, 1.5) centre (0, 0) ccw projected
  line L0 (0, -3.85) -> (3.85, -3.85)
  circle A1 centre (0, 0) radius 3.85
  line L1 (0, 3.85) -> (-3.85, 3.85)
  line L2 (-3.85, 3.85) -> (3.85, 3.85)
  line L3 (3.85, 3.85) -> (3.85, -3.85)
  line L4 (3.85, -3.85) -> (-3.85, -3.85)
  line L5 (-3.85, -3.85) -> (-3.85, 3.85)
  circle A2 centre (-69.691, 0) radius 3 projected
  arc A3 (-66.1452, 1.5) -> (-66.1452, -1.5) centre (-69.691, 0) ccw projected
  circle A4 centre (-69.691, 0) radius 3.85
  line L6 (-69.691, 3.85) -> (-73.541, 3.85)
  line L7 (-73.541, 3.85) -> (-65.841, 3.85)
  line L8 (-65.841, 3.85) -> (-65.841, -3.85)
  line L9 (-65.841, -3.85) -> (-73.541, -3.85)
  line L10 (-73.541, -3.85) -> (-73.541, 3.85)
  point P0 (-79.7, 0)
  point P1 (-3.85, 0)
  point P2 (-3.5458, -1.5)
  point P3 (-3.5458, 1.5)
  point P4 (-69.691, -3.85)
  point P5 (-65.841, 0)
  point P6 (-66.1452, -1.5)
extrude "Extrusion44" cut sketch "Sketch50" against normal blind 10 contours A0 L4 L5 A1
extrude "Extrusion45" cut sketch "Sketch50" against normal blind 10 contours L5 L1 A0 A1
extrude "Extrusion46" cut sketch "Sketch50" against normal blind 10 contours A1 A0
extrude "Extrusion47" cut sketch "Sketch50" against normal blind 10 contours L8 L9 A3 A4
extrude "Extrusion48" cut sketch "Sketch50" against normal blind 10 contours A3 L7 L8 A4
extrude "Extrusion49" cut sketch "Sketch50" against normal blind 10 contours A4 A3
sketch "Sketch51" plane through (75.85, 5, 1.5) normal (1, 0, 0) x (0, 0, -1)
  line L0 (-1.5, 0) -> (4.5, 0)
  line L1 (4.5, 0) -> (4.5, -5)
  line L2 (4.5, -5) -> (-1.5, -5)
  line L3 (-1.5, -5) -> (-1.5, 0)
  line L4 (-1.5, 0) -> (4.5, 0)
  line L5 (4.5, 0) -> (4.5, 1)
  line L6 (4.5, 1) -> (-1.5, 1)
  line L7 (-1.5, 1) -> (-1.5, 0)
  point P0 (1.5, -5)
  point P1 (4.5, 0)
  dimension "d128" = 5
  dimension "d129" = 1
extrude "Extrusion50" add sketch "Sketch51" along normal blind 5 contours L0 L1 L2 L3
extrude "Extrusion51" add sketch "Sketch51" along normal blind 5 contours L7 L6 L5 L0
sketch "Sketch52" plane through (13.859, 5, -1.5) normal (-1, 0, 0) x (0, 0, 1)
  line L0 (-1.5, -5) -> (-1.5, 1) projected
  line L1 (4.5, -5) -> (-1.5, -5) projected
  line L2 (-1.5, 1) -> (4.5, 1)
  line L3 (4.5, 1) -> (4.5, -5)
  line L4 (4.5, -5) -> (-1.5, -5)
  line L5 (-1.5, -5) -> (-1.5, 1)
  point P0 (1.5, -5)
extrude "Extrusion52" add sketch "Sketch52" along normal blind 5
sketch "Sketch53" plane through (13.859, 5, -1.5) normal (1, 0, 0) x (0, 0, -1)
  line L0 (-4.5, 1) -> (-4.5, -1.5) projected
  line L1 (1.5, -5) -> (1.5, -2.5) projected
  line L2 (-4.5, 1) -> (1.5, 1)
  line L3 (1.5, 1) -> (1.5, -5)
  line L4 (1.5, -5) -> (-4.5, -5)
  line L5 (-4.5, -5) -> (-4.5, 1)
  point P0 (-1.5, -5)
extrude "Extrusion53" add sketch "Sketch53" along normal blind 2
sketch "Sketch54" plane through (75.85, 5, 1.5) normal (-1, 0, 0) x (0, 0, 1)
  line L0 (-4.5, -5) -> (1.5, -5) projected
  line L1 (1.5, 1) -> (-4.5, 1) projected
  line L2 (-4.5, -5) -> (1.5, -5)
  line L3 (1.5, -5) -> (1.5, 1)
  line L4 (1.5, 1) -> (-4.5, 1)
  line L5 (-4.5, 1) -> (-4.5, -5)
  point P0 (-1.5, -5)
extrude "Extrusion54" add sketch "Sketch54" along normal blind 2
sketch "Sketch55" plane through (80.85, 5, 1.5) normal (1, 0, 0) x (0, 0, -1)
  circle A0 centre (1.5, -2) radius 1.95
  point P0 (1.5, -5)
  dimension "d140" = 3.9
extrude "Extrusion55" cut sketch "Sketch55" against normal blind 6
sketch "Sketch56" plane through (8.859, 5, -1.5) normal (-1, 0, 0) x (0, 0, 1)
  circle A0 centre (1.5, -2) radius 1.95
  point P0 (1.5, -5)
  dimension "d143" = 3.9
extrude "Extrusion56" cut sketch "Sketch56" against normal blind 6
fillet "Fillet5" radius 2 4 edges at (12.359, 6, 3) (12.359, 0, 3) (12.359, 6, -3) (12.359, 0, -3)
fillet "Fillet6" radius 2 4 edges at (77.35, 6, 3) (77.35, 6, -3) (77.35, 0, -3) (77.35, 0, 3)
sketch "Sketch57" plane through (80.85, 5, 1.5) normal (1, 0, 0) x (0, 0, -1)
  line L0 (-1.5, 1) -> (4.5, 1)
  line L1 (4.5, 1) -> (4.5, -5)
  line L2 (4.5, -5) -> (-1.5, -5)
  line L3 (-1.5, -5) -> (-1.5, 1)
  point P0 (1.5, -5)
  dimension "d148" = 6
  dimension "d149" = 6
extrude "Extrusion57" cut sketch "Sketch57" against normal blind 22
sketch "Sketch58" plane through (58.85, 5, 1.5) normal (1, 0, 0) x (0, 0, -1)
  line L0 (-1.5, 1) -> (4.5, 1)
  line L1 (4.5, 1) -> (4.5, -5)
  line L2 (4.5, -5) -> (-1.5, -5)
  line L3 (-1.5, -5) -> (-1.5, 1)
  point P0 (1.5, -5)
  dimension "d152" = 6
extrude "Extrusion58" add sketch "Sketch58" along normal blind 7
sketch "Sketch59" plane through (65.85, 5, 1.5) normal (1, 0, 0) x (0, 0, -1)
  circle A0 centre (1.5, -2) radius 1.95
  point P0 (1.5, -5)
  dimension "d155" = 3.9
extrude "Extrusion59" cut sketch "Sketch59" against normal blind 6
fillet "Fillet7" radius 2 1 edges at (62.35, 6, 3)
fillet "Fillet8" radius 2 1 edges at (62.35, 0, 3)
fillet "Fillet9" radius 2 1 edges at (62.35, 0, -3)
fillet "Fillet10" radius 2 1 edges at (62.35, 6, -3)
properties part number "Part3_3DPrint"
